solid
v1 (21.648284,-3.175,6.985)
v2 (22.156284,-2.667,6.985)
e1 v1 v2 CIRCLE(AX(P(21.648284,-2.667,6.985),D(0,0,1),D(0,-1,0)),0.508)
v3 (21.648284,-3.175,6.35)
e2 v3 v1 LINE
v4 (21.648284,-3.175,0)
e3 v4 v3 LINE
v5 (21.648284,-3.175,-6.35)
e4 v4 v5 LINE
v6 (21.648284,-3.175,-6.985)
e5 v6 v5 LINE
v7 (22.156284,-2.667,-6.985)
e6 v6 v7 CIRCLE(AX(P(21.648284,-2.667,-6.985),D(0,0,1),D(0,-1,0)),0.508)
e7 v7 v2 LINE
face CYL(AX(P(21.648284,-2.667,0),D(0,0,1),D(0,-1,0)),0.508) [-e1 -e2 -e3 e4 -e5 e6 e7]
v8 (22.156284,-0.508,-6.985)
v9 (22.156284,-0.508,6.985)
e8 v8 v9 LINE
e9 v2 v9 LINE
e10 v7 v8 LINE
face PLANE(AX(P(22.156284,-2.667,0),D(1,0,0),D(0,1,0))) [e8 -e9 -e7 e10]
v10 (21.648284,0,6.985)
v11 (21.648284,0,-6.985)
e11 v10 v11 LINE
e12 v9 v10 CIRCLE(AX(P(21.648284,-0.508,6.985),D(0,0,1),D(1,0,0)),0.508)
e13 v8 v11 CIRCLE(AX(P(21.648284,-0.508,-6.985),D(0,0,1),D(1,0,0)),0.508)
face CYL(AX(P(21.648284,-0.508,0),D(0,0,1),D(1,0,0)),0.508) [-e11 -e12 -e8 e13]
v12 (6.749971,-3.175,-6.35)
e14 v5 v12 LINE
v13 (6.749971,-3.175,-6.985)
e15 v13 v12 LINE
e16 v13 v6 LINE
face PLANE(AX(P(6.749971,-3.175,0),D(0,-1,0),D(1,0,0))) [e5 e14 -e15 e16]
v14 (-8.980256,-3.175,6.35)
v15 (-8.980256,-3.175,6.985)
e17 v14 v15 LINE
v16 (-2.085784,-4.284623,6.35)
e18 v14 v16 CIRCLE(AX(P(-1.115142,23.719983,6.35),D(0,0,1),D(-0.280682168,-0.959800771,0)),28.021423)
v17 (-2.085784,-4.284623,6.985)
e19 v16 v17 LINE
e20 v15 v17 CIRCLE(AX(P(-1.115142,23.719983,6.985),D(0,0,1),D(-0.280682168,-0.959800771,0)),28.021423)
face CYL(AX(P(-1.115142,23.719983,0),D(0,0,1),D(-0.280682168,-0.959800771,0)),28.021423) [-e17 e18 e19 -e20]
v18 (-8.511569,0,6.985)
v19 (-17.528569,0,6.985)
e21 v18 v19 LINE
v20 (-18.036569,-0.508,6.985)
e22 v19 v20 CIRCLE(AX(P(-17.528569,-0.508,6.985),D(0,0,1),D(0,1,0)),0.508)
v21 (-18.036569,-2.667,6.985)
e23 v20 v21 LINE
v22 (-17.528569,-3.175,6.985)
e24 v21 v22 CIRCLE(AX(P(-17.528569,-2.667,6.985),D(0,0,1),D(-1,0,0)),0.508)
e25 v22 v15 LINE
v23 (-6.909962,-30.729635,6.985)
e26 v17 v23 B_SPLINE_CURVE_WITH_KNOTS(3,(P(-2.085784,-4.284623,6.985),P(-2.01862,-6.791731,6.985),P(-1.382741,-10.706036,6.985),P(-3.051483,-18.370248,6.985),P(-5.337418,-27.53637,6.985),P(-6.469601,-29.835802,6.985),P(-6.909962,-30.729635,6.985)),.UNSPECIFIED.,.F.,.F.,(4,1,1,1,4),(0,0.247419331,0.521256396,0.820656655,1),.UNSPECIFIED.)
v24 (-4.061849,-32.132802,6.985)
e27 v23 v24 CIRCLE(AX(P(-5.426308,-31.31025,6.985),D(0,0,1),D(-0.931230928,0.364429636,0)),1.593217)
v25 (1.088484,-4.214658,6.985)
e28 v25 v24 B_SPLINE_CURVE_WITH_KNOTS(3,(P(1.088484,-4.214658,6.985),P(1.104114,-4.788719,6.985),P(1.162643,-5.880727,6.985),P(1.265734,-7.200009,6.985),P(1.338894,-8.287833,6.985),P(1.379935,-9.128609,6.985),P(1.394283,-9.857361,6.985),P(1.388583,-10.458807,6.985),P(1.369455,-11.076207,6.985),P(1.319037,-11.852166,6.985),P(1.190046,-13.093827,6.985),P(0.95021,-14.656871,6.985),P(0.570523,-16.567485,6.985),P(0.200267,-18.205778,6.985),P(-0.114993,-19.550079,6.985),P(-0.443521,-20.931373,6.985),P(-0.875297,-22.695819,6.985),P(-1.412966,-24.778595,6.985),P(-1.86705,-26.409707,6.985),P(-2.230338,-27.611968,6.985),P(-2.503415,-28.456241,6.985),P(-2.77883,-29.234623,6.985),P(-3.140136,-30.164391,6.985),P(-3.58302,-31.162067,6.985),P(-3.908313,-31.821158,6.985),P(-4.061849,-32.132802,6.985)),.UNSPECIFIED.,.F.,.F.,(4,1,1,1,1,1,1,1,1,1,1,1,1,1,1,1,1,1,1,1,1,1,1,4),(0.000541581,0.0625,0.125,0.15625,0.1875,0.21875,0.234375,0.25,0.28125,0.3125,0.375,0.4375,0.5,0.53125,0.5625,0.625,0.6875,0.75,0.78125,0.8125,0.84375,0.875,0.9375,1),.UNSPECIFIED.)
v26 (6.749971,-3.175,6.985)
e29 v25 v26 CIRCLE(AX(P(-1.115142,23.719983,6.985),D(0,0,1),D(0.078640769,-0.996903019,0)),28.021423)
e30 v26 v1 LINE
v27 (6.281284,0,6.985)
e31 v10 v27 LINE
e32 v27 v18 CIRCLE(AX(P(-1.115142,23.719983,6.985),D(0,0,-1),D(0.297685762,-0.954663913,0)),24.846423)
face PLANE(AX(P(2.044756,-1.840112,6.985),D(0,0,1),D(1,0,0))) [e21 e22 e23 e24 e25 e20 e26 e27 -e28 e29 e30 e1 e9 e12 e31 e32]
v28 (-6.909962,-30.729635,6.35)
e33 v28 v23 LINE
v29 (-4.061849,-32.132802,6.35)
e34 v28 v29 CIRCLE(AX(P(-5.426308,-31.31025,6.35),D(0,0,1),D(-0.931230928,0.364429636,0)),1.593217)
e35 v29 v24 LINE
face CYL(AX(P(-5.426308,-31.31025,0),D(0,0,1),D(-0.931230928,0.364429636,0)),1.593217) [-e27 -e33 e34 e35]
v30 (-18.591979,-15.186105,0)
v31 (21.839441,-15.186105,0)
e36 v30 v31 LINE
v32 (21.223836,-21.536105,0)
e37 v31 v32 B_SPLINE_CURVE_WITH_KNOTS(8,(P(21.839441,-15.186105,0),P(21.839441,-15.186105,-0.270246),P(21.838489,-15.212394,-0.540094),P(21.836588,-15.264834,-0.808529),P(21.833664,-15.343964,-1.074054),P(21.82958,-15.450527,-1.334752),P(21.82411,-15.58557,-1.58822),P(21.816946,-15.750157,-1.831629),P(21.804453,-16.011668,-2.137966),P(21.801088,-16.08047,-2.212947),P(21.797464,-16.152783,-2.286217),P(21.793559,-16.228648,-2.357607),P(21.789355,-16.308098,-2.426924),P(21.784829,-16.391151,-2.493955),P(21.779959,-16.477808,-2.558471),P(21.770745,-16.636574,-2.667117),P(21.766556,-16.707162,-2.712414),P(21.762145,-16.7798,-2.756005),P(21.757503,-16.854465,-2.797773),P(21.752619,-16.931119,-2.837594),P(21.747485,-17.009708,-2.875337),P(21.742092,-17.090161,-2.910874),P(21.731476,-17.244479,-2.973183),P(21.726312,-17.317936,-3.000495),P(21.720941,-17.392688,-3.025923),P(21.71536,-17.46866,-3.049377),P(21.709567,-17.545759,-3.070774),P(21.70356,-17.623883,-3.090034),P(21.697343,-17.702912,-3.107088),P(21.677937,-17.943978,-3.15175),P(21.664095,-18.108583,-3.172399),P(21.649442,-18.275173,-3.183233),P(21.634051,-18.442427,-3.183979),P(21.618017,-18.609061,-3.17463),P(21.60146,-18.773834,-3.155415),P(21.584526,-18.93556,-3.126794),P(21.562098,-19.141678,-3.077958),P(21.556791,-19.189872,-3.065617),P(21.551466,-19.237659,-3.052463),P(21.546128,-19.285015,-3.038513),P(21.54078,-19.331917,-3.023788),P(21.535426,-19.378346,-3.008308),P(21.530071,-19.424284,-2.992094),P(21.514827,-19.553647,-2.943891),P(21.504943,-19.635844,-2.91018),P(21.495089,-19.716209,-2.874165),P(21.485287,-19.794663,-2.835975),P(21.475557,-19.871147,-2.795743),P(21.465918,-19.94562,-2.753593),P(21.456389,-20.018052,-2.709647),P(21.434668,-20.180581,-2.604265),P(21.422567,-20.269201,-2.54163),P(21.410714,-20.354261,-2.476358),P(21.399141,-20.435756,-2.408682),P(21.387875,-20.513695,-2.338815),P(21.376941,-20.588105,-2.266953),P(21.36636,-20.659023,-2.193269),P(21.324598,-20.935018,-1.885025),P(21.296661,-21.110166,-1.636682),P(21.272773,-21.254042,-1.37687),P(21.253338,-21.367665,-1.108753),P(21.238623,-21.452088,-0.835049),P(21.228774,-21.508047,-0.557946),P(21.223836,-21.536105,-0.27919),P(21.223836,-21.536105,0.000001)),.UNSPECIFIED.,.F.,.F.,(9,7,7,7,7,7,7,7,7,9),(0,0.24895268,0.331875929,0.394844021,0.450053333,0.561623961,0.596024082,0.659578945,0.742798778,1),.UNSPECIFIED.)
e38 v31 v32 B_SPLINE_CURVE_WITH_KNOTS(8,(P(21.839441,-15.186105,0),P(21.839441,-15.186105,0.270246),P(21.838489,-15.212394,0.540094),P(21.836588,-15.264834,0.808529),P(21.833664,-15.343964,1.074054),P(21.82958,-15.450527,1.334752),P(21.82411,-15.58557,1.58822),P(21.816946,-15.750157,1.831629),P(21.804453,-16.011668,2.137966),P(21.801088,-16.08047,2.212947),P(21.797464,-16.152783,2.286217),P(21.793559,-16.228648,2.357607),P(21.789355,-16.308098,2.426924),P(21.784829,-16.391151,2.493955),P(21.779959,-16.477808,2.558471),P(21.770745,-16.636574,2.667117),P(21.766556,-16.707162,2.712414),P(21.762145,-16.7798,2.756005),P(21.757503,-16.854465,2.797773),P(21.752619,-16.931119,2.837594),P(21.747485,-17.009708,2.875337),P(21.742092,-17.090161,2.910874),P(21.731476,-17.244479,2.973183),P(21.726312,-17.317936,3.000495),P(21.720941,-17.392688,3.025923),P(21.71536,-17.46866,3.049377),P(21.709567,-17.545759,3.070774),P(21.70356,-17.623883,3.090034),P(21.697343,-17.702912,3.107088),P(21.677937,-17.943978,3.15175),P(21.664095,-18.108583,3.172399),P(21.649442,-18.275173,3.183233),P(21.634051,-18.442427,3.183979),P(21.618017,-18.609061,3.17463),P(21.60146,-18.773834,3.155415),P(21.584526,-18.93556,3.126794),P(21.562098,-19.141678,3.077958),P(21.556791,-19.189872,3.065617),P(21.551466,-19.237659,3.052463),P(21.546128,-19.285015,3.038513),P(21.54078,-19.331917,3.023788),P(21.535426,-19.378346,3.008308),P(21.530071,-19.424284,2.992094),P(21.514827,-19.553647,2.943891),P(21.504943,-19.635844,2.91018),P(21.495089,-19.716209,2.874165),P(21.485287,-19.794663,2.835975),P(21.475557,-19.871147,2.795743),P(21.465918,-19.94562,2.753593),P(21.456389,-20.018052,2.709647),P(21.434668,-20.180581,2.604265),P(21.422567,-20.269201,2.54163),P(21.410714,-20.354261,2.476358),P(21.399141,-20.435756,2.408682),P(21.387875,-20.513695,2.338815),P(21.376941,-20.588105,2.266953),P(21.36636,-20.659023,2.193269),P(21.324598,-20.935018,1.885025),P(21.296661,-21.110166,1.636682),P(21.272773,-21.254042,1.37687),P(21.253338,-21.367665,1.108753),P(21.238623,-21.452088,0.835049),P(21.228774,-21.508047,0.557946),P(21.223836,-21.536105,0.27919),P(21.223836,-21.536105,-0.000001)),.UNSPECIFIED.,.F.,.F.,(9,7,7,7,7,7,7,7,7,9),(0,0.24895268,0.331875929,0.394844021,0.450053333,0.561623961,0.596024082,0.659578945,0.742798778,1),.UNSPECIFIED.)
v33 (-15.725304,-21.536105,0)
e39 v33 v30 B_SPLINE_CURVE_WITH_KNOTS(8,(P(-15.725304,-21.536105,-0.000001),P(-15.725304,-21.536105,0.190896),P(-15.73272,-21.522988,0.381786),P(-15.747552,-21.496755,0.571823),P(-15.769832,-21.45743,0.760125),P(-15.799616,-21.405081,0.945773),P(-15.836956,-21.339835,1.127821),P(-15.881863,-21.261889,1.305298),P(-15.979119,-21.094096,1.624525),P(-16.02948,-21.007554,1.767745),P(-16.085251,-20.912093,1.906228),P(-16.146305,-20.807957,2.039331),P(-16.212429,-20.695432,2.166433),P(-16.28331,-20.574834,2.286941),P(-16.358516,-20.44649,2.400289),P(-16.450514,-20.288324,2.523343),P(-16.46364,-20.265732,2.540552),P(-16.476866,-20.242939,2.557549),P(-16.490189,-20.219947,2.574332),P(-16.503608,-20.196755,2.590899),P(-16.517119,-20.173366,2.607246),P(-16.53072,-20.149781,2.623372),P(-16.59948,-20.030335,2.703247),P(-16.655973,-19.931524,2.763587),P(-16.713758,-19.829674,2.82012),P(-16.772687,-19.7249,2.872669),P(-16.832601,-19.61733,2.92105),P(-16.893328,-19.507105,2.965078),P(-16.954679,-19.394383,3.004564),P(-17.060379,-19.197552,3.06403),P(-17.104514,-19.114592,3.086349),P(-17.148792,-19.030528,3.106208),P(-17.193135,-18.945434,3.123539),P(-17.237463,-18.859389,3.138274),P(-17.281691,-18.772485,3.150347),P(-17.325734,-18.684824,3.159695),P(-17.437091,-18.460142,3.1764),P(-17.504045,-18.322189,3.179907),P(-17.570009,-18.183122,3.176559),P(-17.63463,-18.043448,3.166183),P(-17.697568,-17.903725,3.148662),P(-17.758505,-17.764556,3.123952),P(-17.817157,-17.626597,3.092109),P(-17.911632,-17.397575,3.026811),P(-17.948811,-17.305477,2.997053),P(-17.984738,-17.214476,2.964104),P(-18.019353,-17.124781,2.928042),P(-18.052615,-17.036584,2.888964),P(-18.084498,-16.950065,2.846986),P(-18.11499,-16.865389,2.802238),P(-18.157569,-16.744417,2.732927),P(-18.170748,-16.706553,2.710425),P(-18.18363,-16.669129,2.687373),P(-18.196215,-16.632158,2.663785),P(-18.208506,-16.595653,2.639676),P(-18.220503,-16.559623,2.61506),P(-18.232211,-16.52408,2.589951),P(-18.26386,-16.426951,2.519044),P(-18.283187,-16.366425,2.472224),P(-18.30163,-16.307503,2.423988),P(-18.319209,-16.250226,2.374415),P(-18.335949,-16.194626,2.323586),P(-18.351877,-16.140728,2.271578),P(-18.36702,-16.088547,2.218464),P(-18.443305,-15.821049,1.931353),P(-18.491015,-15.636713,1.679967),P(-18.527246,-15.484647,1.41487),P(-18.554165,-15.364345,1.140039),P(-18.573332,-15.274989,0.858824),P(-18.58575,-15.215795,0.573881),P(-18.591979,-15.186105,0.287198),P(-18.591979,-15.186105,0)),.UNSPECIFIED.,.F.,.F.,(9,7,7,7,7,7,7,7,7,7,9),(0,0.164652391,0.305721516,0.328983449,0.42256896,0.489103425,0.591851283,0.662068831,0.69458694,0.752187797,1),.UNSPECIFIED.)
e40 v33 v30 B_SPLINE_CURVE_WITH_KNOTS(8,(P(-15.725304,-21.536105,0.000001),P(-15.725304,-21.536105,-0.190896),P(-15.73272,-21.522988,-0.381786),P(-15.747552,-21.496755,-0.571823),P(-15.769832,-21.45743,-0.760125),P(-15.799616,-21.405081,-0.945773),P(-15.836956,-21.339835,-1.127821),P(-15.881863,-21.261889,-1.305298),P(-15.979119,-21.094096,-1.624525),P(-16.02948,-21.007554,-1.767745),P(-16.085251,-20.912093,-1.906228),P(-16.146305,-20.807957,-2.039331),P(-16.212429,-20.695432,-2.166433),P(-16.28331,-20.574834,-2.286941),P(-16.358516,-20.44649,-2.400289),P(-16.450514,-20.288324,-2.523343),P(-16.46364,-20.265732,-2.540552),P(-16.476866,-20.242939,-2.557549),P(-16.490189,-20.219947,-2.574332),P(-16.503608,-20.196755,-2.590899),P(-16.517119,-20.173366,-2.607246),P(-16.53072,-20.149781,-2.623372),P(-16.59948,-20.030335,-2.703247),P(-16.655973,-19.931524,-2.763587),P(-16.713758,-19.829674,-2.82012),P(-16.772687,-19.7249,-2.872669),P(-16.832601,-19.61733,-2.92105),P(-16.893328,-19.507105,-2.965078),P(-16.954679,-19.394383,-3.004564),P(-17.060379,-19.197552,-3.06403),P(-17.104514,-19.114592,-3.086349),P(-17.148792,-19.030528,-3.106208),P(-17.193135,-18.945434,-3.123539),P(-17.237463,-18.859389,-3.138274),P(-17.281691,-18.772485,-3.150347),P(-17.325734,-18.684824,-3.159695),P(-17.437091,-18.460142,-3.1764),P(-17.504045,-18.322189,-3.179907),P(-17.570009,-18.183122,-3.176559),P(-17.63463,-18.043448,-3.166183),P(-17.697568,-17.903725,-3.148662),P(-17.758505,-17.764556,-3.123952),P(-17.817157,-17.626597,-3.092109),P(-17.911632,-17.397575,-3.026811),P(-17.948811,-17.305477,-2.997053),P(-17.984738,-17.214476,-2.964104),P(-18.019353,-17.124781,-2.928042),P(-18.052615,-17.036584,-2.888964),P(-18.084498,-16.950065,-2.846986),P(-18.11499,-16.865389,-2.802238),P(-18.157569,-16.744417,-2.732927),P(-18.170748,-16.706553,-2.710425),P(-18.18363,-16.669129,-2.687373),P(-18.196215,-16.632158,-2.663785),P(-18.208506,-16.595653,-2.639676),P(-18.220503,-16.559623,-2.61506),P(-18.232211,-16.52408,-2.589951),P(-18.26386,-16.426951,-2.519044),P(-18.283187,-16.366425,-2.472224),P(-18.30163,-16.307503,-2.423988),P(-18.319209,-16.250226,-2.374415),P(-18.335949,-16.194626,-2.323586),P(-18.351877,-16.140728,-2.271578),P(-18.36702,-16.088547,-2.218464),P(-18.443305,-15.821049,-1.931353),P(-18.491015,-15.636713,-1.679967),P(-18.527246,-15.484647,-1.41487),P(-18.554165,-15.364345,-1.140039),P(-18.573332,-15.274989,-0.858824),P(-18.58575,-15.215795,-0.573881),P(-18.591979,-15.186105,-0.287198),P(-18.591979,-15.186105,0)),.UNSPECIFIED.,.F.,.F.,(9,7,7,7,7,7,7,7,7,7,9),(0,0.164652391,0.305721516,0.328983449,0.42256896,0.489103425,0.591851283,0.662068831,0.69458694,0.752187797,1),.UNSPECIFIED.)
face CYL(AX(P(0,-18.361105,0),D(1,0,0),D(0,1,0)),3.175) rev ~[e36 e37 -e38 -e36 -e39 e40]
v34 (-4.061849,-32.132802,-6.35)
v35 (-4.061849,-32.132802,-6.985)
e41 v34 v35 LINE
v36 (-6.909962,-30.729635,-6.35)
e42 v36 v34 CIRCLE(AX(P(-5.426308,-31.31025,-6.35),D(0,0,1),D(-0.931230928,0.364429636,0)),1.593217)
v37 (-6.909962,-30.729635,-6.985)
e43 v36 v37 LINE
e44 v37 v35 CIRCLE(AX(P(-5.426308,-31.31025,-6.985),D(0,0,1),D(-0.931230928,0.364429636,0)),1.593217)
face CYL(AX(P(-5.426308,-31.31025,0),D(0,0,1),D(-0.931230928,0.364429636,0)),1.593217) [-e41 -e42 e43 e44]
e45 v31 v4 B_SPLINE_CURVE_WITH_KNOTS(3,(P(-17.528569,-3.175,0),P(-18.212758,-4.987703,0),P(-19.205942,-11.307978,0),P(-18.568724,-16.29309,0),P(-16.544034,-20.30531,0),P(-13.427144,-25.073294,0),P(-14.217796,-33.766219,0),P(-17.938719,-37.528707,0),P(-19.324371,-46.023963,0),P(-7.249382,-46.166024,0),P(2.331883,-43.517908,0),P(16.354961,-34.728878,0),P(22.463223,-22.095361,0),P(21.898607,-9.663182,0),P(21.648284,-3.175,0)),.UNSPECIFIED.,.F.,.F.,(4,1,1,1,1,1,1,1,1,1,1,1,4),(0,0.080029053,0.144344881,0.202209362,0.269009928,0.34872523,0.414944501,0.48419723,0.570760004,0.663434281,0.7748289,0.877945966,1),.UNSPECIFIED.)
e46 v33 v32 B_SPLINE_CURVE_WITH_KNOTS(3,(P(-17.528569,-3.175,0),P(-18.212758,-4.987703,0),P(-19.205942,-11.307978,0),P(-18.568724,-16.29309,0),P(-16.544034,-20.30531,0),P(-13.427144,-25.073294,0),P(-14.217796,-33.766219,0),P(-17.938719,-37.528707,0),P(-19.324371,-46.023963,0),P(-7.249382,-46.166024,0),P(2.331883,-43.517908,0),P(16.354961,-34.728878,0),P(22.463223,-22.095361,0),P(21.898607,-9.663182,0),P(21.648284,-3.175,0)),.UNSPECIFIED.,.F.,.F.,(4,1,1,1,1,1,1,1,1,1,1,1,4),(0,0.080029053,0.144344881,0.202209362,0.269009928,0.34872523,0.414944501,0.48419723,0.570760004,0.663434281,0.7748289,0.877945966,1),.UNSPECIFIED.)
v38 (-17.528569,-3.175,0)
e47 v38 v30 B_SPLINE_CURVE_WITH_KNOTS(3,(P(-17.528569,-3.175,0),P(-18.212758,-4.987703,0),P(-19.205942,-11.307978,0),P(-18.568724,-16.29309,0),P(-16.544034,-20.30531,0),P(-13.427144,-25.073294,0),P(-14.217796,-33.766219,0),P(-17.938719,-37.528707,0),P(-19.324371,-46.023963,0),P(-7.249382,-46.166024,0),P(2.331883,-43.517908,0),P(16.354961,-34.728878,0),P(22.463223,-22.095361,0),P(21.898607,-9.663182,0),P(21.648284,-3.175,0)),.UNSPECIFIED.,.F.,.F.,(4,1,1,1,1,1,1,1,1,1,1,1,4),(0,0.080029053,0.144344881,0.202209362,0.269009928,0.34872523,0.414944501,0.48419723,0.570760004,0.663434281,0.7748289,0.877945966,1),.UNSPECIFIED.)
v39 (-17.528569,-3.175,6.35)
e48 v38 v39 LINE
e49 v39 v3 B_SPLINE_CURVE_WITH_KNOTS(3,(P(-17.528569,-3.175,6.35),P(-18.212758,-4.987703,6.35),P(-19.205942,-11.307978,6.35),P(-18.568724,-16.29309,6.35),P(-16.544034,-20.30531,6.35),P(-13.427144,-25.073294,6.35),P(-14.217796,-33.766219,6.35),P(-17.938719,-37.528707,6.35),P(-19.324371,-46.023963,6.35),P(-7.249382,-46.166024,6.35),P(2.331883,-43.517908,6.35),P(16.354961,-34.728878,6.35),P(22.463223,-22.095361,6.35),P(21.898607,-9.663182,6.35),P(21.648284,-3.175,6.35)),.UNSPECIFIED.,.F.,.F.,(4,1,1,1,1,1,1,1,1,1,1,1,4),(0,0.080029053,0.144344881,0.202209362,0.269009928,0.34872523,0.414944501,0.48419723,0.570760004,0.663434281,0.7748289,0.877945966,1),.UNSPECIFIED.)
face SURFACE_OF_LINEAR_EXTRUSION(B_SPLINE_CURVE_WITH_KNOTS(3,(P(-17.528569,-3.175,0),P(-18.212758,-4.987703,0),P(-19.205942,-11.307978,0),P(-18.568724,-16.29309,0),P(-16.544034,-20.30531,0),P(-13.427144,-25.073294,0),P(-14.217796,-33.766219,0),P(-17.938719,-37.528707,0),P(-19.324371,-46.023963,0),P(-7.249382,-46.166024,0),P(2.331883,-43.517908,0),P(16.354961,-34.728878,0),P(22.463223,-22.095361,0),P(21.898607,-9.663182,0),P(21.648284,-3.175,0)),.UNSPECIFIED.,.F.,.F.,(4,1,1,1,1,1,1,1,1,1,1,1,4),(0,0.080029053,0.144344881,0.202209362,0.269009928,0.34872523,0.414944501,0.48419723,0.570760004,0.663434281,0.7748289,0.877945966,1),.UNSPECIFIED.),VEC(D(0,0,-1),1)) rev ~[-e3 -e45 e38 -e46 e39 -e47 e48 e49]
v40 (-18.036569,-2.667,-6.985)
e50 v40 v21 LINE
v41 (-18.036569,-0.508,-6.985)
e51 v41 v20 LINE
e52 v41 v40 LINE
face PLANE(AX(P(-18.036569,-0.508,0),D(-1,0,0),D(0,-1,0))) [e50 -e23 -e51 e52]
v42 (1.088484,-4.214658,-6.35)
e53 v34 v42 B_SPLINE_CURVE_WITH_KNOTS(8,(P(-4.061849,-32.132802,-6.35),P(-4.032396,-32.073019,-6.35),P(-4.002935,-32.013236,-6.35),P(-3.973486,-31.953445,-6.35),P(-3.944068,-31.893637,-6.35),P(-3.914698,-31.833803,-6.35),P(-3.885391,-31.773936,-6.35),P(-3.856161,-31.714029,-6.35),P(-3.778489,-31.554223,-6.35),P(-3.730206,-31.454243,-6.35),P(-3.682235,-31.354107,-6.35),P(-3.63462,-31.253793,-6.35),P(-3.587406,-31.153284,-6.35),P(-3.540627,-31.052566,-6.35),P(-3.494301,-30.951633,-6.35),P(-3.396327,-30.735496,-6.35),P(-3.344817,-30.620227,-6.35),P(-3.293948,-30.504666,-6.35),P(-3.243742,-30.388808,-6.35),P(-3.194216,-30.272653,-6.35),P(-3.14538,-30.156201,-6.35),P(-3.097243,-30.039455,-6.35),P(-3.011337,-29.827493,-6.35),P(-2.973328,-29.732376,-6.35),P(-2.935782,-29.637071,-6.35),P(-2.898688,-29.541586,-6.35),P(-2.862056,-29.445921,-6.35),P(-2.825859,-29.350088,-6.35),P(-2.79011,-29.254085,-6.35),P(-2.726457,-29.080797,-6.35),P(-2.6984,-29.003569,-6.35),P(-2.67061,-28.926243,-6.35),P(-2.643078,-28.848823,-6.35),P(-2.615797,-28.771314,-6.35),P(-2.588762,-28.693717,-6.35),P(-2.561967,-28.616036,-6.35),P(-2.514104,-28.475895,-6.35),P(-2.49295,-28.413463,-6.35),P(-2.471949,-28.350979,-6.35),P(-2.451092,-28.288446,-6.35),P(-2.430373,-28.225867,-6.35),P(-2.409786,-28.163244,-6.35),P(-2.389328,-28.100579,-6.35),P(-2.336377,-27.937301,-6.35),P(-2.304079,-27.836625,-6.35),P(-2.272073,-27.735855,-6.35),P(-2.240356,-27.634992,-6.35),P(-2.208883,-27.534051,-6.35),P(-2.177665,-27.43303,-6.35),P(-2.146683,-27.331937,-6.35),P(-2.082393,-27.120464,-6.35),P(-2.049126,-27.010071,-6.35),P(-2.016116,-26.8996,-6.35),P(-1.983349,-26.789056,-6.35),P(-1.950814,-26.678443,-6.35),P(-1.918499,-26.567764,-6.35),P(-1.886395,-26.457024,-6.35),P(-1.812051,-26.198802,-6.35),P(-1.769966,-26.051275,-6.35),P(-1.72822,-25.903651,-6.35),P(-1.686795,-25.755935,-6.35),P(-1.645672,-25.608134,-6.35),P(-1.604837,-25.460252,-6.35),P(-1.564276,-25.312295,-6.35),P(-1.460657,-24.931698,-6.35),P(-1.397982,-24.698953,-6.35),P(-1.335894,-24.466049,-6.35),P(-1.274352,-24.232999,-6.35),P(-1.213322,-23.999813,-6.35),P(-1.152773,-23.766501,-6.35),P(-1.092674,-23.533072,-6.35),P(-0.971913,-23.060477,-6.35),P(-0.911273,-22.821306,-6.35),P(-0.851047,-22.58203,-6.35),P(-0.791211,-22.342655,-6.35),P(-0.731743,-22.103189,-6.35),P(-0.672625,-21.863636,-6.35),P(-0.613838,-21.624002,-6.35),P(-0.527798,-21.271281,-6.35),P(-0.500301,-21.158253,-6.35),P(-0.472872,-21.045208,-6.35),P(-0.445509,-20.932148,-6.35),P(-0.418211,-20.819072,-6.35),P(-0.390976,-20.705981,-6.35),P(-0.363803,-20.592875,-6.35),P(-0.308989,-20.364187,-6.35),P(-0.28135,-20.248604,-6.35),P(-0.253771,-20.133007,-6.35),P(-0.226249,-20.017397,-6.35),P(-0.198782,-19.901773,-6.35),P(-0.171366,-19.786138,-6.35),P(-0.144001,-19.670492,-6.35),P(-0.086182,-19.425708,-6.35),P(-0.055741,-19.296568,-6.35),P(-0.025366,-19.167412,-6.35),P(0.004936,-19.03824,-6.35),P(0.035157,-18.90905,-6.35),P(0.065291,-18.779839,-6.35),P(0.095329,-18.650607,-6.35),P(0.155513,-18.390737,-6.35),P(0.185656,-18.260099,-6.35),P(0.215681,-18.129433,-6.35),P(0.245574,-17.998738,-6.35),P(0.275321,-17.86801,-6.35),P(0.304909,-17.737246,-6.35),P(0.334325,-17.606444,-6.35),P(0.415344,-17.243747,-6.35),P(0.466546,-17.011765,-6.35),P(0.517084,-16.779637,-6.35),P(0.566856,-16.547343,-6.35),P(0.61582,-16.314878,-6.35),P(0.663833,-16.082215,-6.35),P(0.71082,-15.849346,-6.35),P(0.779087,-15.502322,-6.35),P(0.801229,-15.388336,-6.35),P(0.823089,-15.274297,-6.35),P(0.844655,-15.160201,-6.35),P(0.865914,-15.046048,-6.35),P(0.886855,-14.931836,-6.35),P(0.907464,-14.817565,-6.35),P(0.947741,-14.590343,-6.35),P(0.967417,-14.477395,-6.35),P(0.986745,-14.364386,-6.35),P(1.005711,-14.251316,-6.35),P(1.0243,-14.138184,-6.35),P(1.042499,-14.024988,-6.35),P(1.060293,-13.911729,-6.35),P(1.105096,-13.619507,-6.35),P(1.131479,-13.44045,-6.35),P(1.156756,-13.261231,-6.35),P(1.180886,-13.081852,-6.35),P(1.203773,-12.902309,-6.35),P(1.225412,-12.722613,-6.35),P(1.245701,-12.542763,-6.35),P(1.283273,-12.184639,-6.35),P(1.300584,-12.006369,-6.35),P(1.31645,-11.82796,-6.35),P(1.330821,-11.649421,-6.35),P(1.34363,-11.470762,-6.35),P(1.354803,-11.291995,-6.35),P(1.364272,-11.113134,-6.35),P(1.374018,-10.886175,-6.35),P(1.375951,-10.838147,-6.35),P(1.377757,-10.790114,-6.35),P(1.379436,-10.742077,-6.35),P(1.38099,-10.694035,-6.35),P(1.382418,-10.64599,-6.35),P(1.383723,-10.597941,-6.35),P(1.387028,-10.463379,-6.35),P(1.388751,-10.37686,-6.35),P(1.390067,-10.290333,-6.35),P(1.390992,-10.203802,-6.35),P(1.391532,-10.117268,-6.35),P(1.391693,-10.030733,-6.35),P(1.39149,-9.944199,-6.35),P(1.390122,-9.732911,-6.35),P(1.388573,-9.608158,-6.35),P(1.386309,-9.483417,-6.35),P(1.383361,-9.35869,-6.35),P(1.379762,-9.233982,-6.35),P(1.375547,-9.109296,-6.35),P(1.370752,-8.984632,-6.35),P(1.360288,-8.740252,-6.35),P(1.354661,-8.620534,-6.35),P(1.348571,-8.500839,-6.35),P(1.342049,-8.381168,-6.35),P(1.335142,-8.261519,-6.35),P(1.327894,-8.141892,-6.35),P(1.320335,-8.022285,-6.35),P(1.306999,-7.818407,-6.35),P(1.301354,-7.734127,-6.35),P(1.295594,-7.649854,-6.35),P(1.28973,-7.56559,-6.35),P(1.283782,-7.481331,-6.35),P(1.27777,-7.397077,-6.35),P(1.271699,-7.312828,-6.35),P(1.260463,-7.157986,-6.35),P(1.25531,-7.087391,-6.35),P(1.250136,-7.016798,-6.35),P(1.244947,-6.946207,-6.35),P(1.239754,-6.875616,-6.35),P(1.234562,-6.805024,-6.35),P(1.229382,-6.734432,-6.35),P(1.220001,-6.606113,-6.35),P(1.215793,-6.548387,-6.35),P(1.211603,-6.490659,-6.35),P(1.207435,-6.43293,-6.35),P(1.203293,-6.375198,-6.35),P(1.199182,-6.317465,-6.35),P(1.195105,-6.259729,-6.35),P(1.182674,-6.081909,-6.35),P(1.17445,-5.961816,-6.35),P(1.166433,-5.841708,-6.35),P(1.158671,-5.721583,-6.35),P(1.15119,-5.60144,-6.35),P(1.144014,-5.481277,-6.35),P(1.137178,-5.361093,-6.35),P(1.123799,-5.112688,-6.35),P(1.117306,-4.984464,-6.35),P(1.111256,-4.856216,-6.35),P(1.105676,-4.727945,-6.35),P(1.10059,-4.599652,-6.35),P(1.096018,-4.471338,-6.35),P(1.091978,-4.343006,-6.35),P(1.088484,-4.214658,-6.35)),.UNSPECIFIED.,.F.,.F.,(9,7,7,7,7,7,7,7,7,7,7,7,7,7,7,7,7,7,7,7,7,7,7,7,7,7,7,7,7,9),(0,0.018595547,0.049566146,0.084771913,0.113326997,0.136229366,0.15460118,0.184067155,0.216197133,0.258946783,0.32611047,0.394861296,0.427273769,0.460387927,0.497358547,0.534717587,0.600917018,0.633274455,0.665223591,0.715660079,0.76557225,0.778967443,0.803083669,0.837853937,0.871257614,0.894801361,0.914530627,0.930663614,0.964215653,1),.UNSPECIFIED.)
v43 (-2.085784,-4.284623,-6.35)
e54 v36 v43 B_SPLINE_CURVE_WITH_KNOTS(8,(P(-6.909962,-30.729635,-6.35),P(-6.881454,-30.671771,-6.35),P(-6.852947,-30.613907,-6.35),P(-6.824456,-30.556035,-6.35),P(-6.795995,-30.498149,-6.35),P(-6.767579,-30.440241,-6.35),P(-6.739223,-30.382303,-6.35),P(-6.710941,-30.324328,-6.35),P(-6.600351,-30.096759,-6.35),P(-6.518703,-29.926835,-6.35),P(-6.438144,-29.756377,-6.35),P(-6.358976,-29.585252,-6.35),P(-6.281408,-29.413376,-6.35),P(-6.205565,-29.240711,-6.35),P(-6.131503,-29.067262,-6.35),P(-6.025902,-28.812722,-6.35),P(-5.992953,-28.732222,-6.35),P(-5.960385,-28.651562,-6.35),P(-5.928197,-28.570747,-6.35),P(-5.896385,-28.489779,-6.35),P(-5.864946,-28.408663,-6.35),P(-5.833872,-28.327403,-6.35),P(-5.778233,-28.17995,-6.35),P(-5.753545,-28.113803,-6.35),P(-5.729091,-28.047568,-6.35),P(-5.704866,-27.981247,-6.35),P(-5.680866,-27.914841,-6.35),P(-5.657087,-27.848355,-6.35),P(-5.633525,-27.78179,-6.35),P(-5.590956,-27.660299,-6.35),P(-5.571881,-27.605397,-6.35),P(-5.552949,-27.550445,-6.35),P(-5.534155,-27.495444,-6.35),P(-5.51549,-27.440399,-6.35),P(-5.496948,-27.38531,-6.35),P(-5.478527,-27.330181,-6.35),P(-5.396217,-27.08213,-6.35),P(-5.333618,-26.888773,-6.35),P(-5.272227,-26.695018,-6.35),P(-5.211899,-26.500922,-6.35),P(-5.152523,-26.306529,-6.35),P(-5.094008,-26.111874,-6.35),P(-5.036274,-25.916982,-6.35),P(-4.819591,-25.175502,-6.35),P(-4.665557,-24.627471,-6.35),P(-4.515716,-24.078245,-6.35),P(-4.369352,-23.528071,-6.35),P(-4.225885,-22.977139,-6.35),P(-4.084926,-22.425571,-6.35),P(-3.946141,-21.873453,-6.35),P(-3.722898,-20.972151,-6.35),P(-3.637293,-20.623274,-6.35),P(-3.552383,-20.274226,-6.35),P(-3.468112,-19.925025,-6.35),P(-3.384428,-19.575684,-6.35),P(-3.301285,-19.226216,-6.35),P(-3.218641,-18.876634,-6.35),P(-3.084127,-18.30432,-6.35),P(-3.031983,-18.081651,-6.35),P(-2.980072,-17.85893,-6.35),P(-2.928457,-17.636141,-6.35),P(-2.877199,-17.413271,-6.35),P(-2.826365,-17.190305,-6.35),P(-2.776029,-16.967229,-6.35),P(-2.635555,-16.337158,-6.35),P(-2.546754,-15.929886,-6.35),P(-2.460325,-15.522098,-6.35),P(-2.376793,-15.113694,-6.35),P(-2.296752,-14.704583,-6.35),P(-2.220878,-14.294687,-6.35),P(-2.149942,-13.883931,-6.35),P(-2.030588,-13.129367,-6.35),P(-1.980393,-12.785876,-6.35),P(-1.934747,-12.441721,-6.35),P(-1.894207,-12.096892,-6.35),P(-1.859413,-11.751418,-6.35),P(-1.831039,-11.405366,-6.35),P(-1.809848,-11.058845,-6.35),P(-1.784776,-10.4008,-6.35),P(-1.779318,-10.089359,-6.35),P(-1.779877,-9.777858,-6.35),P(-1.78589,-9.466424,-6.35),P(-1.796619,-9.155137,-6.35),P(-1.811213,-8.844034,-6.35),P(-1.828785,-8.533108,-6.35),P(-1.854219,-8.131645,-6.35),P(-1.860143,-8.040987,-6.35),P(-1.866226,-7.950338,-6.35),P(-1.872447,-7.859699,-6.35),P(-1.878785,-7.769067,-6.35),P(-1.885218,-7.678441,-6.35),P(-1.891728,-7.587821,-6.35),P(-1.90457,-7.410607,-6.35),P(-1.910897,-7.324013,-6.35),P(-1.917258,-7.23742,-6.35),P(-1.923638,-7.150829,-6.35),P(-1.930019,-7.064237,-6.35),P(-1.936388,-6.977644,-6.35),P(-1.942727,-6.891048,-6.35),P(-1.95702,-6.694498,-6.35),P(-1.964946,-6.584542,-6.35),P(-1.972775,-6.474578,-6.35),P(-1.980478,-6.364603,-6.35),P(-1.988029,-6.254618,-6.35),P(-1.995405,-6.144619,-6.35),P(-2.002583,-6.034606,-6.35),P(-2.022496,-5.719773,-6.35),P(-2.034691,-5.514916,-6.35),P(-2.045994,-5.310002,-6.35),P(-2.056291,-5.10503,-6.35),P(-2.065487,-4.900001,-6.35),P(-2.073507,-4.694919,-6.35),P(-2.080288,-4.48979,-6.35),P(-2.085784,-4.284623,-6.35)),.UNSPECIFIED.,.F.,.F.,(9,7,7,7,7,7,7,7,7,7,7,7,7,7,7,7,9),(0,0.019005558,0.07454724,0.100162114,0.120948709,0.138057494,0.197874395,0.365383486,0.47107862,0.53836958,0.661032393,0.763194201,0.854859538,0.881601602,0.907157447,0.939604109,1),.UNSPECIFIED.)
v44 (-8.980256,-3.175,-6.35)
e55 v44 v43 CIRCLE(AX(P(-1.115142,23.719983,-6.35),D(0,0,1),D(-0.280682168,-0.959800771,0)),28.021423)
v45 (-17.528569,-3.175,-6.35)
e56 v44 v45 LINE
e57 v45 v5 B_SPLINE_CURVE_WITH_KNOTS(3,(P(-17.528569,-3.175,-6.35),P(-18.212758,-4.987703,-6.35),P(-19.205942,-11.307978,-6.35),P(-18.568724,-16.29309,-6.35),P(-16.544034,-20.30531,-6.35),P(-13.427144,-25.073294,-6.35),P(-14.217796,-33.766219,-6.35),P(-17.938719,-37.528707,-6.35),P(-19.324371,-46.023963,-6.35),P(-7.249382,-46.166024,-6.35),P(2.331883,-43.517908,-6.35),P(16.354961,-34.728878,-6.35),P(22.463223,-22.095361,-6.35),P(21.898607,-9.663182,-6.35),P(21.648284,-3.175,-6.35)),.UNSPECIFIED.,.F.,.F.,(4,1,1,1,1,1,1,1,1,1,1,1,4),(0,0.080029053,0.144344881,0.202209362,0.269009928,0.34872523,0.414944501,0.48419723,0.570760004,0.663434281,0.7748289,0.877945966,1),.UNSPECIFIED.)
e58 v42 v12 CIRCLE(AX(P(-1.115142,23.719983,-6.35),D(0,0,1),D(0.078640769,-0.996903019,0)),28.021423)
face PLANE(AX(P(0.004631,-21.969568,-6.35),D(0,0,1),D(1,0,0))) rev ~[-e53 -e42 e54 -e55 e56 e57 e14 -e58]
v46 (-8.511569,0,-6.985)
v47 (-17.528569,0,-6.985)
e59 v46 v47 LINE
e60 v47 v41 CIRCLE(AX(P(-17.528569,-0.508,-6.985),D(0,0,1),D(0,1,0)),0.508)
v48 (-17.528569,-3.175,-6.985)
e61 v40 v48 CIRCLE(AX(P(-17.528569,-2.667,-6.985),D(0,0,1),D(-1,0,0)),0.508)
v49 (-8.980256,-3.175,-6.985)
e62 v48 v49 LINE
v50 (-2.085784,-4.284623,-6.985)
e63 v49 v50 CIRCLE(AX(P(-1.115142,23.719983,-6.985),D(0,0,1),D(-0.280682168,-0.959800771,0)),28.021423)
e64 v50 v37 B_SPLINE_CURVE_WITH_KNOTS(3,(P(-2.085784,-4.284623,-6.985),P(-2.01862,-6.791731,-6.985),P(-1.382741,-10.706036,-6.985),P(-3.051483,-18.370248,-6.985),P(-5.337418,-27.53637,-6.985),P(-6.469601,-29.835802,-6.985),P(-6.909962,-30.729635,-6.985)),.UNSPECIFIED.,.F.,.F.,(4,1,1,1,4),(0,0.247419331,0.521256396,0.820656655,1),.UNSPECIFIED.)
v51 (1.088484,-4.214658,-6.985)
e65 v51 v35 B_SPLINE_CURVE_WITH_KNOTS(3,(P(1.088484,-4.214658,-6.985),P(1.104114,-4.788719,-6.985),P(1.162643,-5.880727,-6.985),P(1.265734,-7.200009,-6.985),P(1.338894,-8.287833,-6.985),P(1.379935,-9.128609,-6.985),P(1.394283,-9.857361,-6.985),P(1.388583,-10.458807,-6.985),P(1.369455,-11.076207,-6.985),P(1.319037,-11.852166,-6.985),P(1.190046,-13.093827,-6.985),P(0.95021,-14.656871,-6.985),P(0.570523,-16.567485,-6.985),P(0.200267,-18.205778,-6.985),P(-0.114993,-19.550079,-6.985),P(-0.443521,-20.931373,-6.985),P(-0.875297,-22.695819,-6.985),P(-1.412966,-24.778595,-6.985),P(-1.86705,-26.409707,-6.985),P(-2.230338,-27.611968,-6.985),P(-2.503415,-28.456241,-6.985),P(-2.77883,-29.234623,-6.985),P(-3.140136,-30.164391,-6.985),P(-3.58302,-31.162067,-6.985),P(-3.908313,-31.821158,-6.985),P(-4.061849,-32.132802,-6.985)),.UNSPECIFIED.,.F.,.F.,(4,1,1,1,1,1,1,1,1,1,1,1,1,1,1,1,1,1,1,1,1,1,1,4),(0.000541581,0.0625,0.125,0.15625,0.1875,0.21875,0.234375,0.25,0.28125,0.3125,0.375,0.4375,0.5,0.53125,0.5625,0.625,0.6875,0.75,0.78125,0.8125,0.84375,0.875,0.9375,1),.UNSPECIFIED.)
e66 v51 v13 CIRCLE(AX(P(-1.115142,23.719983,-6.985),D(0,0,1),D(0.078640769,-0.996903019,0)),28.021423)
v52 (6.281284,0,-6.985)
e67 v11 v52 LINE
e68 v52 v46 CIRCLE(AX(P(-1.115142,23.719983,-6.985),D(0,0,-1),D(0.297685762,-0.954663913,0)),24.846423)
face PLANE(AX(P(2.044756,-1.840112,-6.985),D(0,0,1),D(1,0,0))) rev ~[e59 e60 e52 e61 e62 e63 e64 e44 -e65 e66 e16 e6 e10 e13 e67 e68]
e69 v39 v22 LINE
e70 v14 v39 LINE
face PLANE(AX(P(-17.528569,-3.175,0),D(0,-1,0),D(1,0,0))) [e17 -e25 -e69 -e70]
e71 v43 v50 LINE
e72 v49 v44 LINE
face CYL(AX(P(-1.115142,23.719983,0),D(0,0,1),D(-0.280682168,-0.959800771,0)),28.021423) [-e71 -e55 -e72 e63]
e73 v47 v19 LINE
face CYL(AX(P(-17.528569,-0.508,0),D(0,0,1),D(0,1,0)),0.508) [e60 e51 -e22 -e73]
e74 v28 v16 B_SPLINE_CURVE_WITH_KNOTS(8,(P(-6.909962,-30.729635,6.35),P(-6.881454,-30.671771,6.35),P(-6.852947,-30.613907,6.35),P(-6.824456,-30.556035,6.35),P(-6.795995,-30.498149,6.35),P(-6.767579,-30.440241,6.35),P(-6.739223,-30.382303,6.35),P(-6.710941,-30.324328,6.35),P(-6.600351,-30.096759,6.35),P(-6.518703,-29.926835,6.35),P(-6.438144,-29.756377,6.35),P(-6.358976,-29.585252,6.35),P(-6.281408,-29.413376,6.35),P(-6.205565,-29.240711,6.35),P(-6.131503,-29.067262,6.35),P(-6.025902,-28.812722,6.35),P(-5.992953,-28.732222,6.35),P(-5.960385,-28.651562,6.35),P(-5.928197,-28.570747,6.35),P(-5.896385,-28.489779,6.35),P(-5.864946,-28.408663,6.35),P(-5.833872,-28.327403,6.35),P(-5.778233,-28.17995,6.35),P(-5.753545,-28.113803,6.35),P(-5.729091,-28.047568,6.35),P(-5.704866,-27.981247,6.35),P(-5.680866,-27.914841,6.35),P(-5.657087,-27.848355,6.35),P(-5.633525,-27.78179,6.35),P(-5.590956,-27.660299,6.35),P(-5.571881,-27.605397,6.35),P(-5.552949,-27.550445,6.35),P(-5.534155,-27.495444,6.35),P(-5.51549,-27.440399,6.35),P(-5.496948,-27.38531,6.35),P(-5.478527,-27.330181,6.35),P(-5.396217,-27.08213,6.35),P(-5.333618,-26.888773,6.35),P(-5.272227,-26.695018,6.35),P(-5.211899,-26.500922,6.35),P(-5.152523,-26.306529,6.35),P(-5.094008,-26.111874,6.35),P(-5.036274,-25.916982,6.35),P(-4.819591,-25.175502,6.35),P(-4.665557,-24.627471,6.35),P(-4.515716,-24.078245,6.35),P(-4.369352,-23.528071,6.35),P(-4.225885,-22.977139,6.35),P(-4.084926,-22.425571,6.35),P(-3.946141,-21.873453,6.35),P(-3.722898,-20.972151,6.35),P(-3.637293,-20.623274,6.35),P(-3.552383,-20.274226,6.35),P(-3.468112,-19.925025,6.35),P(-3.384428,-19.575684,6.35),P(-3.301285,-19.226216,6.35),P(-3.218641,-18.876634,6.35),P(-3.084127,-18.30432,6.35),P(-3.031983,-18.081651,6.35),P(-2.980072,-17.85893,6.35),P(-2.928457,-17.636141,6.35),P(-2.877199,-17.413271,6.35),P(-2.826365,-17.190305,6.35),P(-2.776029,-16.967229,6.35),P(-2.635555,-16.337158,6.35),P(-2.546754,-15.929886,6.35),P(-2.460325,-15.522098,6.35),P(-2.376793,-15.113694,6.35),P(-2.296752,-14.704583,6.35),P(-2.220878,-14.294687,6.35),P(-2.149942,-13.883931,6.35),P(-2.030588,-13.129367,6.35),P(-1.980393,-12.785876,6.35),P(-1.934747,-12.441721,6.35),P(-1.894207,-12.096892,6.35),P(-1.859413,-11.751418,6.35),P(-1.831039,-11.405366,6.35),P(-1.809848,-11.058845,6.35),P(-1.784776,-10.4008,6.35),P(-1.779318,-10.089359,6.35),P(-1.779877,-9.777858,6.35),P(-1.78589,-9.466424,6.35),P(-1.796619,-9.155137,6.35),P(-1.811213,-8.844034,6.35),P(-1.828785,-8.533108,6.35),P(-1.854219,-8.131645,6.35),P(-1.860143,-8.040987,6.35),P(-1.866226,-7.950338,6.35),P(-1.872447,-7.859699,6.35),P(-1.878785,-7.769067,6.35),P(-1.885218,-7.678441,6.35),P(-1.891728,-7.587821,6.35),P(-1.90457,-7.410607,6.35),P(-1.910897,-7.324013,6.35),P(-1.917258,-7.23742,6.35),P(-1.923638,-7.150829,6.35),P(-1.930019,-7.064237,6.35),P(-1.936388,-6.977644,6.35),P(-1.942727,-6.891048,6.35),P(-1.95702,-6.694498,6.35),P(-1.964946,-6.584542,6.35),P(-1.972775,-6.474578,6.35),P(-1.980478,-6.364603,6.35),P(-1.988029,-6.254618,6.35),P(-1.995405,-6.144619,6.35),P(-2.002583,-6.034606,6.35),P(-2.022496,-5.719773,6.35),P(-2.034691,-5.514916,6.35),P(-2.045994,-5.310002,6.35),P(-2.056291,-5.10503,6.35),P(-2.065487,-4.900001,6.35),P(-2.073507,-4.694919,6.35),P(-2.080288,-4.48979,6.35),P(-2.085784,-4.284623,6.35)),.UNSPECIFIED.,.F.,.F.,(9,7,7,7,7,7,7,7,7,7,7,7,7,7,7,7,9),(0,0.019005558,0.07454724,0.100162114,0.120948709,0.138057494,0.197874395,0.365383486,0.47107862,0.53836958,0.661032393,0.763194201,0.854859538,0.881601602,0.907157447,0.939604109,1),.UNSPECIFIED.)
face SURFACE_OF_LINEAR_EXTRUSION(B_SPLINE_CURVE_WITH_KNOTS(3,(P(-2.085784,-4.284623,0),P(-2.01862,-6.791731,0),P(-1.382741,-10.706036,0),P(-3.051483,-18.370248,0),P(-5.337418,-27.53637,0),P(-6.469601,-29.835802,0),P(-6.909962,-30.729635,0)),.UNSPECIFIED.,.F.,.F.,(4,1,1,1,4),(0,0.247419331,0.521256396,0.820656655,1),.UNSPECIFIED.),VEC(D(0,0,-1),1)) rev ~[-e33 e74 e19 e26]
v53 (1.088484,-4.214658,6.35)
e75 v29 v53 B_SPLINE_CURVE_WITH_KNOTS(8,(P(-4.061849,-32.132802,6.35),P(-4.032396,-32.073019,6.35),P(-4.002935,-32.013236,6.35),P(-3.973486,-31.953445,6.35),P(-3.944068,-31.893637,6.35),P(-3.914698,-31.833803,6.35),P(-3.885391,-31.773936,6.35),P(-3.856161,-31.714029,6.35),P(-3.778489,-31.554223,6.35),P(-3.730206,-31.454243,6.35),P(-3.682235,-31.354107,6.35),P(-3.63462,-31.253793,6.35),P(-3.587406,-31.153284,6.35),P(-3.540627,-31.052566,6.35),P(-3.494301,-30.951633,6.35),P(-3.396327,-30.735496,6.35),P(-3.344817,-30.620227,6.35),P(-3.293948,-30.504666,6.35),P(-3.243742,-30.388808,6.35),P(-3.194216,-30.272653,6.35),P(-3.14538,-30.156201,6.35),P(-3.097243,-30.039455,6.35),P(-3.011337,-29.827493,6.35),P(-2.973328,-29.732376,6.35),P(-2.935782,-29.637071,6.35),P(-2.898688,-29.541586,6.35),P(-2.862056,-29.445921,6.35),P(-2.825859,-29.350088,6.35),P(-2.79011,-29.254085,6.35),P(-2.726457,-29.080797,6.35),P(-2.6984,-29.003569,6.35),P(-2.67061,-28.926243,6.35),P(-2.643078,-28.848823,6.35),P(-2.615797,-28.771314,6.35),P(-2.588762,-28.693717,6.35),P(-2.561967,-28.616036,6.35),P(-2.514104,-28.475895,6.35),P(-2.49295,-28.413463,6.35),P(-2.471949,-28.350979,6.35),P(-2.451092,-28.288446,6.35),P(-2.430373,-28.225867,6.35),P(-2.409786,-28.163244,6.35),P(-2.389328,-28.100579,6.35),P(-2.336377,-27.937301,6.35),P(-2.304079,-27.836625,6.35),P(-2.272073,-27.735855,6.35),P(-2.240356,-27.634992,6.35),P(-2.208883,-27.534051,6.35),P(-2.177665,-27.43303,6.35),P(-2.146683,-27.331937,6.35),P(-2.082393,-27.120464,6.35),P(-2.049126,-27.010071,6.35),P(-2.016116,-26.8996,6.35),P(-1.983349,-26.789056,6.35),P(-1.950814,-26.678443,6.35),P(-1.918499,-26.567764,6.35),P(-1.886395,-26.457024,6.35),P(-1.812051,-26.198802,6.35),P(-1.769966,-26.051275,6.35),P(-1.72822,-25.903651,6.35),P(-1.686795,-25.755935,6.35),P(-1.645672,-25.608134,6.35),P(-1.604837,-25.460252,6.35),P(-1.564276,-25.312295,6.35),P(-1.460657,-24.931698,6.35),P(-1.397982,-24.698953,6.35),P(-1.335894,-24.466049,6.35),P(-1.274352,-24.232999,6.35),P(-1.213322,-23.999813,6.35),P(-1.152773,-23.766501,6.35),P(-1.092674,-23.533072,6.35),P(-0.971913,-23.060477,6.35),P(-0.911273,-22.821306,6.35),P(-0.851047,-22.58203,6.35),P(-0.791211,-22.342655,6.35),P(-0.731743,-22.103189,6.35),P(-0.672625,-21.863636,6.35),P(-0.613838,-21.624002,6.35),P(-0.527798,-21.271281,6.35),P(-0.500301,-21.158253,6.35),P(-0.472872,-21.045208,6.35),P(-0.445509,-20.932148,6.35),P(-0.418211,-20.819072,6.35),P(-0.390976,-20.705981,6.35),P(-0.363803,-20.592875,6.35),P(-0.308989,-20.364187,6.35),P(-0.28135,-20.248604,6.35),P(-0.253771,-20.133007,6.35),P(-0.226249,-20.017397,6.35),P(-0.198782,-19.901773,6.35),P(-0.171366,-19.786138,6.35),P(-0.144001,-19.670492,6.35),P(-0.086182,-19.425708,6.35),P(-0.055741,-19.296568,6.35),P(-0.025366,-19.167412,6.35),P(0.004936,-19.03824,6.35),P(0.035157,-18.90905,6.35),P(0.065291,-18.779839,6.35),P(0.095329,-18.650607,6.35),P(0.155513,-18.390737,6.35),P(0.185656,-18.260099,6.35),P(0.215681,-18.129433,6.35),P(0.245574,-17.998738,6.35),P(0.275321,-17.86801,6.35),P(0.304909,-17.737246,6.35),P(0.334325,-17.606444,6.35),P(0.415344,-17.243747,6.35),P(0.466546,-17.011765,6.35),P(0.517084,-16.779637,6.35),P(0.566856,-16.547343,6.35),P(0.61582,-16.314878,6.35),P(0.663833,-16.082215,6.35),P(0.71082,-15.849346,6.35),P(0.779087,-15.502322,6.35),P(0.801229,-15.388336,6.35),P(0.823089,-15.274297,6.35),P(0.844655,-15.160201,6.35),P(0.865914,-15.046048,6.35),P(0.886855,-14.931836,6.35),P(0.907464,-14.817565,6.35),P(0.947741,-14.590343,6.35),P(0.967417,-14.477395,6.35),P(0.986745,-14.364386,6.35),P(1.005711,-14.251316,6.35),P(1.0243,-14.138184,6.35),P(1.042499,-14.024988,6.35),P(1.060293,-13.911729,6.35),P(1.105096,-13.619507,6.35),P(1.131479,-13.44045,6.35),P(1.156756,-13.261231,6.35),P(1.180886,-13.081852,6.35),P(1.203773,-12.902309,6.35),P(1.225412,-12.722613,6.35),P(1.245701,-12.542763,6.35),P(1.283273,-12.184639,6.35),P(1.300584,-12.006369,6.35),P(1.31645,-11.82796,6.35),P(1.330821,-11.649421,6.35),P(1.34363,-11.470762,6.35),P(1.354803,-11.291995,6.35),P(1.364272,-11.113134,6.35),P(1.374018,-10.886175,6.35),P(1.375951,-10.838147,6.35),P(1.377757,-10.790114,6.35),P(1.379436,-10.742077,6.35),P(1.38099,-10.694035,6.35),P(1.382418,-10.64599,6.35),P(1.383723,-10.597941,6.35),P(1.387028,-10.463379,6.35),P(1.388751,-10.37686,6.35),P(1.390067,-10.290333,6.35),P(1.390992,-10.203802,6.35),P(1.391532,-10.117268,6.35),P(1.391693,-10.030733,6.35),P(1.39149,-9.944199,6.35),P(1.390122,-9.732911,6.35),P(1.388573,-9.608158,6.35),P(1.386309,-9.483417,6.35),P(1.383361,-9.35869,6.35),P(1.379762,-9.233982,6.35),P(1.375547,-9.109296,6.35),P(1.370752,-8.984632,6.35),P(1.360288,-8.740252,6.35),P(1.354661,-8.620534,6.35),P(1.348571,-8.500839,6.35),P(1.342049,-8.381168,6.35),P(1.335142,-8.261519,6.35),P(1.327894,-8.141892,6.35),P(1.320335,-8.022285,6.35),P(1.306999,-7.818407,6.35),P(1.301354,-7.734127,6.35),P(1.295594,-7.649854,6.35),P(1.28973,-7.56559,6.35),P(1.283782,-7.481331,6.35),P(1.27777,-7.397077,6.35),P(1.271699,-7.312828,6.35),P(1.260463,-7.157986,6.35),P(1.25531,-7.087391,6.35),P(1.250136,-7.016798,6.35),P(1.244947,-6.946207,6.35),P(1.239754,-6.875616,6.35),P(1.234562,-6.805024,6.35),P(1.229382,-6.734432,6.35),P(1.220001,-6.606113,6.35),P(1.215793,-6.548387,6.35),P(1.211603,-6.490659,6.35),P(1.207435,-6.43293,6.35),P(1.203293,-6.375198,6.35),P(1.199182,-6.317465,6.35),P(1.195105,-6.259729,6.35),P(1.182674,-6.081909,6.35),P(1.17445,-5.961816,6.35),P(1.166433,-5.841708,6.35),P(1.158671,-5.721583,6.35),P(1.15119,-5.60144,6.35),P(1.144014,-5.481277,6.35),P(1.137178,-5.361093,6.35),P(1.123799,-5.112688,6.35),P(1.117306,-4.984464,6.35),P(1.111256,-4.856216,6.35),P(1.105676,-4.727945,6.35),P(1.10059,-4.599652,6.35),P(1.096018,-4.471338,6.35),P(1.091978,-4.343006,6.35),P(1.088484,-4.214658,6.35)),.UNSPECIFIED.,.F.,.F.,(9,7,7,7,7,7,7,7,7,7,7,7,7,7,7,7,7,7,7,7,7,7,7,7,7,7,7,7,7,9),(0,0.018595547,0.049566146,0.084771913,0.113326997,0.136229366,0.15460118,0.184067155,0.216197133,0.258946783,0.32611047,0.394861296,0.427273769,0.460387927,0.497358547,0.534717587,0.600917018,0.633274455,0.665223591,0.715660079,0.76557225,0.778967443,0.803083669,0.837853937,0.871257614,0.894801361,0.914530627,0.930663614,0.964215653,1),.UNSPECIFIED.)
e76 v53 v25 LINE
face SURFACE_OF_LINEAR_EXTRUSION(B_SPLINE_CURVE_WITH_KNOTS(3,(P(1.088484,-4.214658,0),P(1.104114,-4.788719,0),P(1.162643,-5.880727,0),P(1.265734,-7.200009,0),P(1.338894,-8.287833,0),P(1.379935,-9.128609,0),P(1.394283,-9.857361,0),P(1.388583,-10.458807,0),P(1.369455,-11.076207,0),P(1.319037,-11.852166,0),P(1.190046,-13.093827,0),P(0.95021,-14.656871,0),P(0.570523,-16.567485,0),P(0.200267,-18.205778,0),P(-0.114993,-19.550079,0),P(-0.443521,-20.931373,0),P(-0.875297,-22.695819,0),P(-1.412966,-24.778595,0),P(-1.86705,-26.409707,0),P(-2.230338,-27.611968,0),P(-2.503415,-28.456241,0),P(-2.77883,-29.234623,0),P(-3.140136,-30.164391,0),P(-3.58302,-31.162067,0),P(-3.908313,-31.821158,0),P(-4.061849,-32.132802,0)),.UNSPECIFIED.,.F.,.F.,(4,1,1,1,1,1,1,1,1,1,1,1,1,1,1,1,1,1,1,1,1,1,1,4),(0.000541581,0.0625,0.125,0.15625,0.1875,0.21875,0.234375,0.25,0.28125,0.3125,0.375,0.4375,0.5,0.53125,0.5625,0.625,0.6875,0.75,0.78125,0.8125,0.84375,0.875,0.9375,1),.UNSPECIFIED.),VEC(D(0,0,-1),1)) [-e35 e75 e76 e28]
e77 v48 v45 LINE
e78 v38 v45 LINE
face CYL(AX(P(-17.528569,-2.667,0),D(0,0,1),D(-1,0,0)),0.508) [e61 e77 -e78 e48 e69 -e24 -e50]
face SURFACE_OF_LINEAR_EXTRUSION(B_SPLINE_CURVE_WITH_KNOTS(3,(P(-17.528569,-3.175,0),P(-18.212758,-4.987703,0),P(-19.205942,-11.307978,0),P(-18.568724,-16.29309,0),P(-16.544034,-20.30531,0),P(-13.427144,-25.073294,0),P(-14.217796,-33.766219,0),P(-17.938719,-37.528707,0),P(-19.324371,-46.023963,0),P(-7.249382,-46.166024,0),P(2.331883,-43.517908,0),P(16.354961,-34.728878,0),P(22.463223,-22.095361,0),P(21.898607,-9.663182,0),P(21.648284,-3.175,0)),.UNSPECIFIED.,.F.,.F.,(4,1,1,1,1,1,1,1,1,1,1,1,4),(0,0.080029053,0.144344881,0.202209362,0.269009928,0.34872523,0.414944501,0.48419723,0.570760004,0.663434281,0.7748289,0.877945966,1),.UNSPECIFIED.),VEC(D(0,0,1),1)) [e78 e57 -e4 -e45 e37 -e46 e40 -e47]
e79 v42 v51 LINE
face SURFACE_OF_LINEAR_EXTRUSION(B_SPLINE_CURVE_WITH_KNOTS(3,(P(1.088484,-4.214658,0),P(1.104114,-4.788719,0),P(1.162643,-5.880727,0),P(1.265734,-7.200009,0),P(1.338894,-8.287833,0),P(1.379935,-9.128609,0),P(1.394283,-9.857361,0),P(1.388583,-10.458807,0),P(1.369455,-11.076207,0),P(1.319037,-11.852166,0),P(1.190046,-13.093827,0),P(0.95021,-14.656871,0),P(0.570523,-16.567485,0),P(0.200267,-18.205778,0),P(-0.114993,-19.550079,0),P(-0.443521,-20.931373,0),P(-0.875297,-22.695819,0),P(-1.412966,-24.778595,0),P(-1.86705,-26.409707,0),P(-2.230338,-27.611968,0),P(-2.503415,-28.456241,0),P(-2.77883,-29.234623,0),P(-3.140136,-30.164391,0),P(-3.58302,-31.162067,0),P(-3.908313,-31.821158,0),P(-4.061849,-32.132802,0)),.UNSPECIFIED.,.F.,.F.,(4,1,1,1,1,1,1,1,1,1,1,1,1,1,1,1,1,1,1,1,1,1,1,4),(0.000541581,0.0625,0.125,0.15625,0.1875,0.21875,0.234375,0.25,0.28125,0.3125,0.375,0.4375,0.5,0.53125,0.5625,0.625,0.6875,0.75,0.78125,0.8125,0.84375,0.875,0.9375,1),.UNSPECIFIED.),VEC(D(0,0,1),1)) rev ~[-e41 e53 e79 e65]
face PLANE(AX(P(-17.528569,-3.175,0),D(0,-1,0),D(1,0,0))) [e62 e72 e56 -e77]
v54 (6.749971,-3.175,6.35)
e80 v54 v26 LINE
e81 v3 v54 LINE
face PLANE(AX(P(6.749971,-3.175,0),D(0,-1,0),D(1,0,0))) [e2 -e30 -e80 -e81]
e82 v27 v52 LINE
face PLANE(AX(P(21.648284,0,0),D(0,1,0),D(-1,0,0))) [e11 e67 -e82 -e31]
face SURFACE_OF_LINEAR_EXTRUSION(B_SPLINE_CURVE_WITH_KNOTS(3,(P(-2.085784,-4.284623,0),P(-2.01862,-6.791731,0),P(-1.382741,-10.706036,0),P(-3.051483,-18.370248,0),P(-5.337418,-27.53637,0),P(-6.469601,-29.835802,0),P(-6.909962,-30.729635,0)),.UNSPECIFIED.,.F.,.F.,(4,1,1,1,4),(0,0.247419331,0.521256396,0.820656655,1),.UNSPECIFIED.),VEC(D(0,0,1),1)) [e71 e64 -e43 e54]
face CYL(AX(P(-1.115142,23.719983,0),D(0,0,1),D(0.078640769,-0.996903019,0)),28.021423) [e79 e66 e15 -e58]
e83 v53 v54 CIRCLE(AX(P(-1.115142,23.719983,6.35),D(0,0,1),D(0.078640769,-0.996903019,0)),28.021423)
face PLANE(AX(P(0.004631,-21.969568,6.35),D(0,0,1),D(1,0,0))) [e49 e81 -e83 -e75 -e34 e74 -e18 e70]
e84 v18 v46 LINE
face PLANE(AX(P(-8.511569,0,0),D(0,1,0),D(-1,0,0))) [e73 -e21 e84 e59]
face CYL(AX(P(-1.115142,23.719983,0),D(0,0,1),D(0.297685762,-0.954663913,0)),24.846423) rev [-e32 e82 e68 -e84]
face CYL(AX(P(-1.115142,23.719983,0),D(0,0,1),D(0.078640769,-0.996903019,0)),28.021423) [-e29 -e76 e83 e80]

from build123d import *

# Parameters (mm, degrees)
F1_DEPTH = 6.985
F3_DEPTH = 6.35
F4_R     = 3.175
F5_DEPTH = 25.4


# Not quite as in the source:
# - the dataset's text gives a spline's control points without its knots; the knots are read off the source's solid


with BuildPart() as f1:
    # F0 (on Top) → F1 (new body, symmetric)
    with BuildSketch(Plane.XY):
        with BuildLine():
            Line((-8.5115687318, 0), (-17.5285687318, 0))
            ThreePointArc((-17.5285687318, 0), (-17.8877789767, -0.1487897552), (-18.0365687318, -0.508))
            Line((-18.0365687318, -0.508), (-18.0365687318, -2.667))
            ThreePointArc((-18.0365687318, -2.667), (-17.8877789767, -3.0262102448), (-17.5285687318, -3.175))
            Line((-17.5285687318, -3.175), (-8.9802561211, -3.175))
            ThreePointArc((-8.9802561211, -3.175), (-5.567721427, -3.9454225439), (-2.0857842173, -4.2846233733))
            ThreePointArc((-2.0857842173, -4.2846233733), (-0.4976584373, -4.2946352768), (1.0884838419, -4.2146577721))
            ThreePointArc((1.0884838419, -4.2146577721), (3.9459941464, -3.8405870368), (6.7499713132, -3.175))
            Line((6.7499713132, -3.175), (21.6482839239, -3.175))
            ThreePointArc((21.6482839239, -3.175), (22.0074941688, -3.0262102448), (22.1562839239, -2.667))
            Line((22.1562839239, -2.667), (22.1562839239, -0.508))
            ThreePointArc((22.1562839239, -0.508), (22.0074941688, -0.1487897552), (21.6482839239, 0))
            Line((21.6482839239, 0), (6.2812839239, 0))
            ThreePointArc((6.2812839239, 0), (-1.115142404, -1.1264395842), (-8.5115687318, 0))
        make_face()
        with BuildLine():
            ThreePointArc((1.0884838419, -4.2146577721), (-0.4976584373, -4.2946352768), (-2.0857842173, -4.2846233733))
            add(Edge.make_bspline(
                [(-2.0857842173, -4.2846233733), (-2.0186199799, -6.7917309713), (-1.3827408713, -10.7060362833), (-3.0514833549, -18.3702475343), (-5.3374183121, -27.5363695718), (-6.4696007178, -29.8358016288), (-6.9099617242, -30.7296345431)],
                knots=[0, 0, 0, 0, 0.2474193311, 0.5212563963, 0.8206566545, 1, 1, 1, 1], degree=3))
            ThreePointArc((-6.9099617242, -30.7296345431), (-6.1304191803, -32.7394350662), (-4.0618492346, -32.1328024756))
            add(Edge.make_bspline(
                [(1.0884838419, -4.2146577721), (1.1041136891, -4.7887191014), (1.1626428475, -5.8807272883), (1.2657335763, -7.2000093187), (1.3388942315, -8.2878331518), (1.379934699, -9.1286093049), (1.3942832103, -9.8573605503), (1.3885828158, -10.4588066051), (1.3694554964, -11.0762065107), (1.319036928, -11.8521658025), (1.1900459057, -13.0938268387), (0.9502096314, -14.6568714282), (0.5705234126, -16.567484773), (0.2002671656, -18.2057784722), (-0.1149929826, -19.5500794084), (-0.4435211016, -20.9313730655), (-0.8752970723, -22.6958190135), (-1.4129660983, -24.7785954156), (-1.867050274, -26.4097068901), (-2.230338473, -27.6119678291), (-2.5034145996, -28.4562408889), (-2.7788303173, -29.2346230816), (-3.1401362262, -30.1643913253), (-3.5830203882, -31.1620666475), (-3.9083126686, -31.8211580877), (-4.0618492346, -32.1328024756)],
                knots=[0.0005415805, 0.0005415805, 0.0005415805, 0.0005415805, 0.0625, 0.125, 0.15625, 0.1875, 0.21875, 0.234375, 0.25, 0.28125, 0.3125, 0.375, 0.4375, 0.5, 0.53125, 0.5625, 0.625, 0.6875, 0.75, 0.78125, 0.8125, 0.84375, 0.875, 0.9375, 1, 1, 1, 1], degree=3))
        make_face()
    extrude(amount=F1_DEPTH, both=True)

    # F2 (on Top) → F3 (join, symmetric)
    with BuildSketch(Plane.XY):
        with BuildLine():
            Line((-8.9802561211, -3.175), (-17.5285687318, -3.175))
            add(Edge.make_bspline(
                [(-17.5285687318, -3.175), (-18.2127580333, -4.9877029103), (-19.205941601, -11.3079780332), (-18.5687236072, -16.2930895041), (-16.5440340125, -20.3053098017), (-13.427143659, -25.0732944009), (-14.2177962554, -33.7662189884), (-17.9387187249, -37.5287065133), (-19.32437096, -46.023963295), (-7.2493815767, -46.1660242972), (2.3318830255, -43.5179077905), (16.3549608676, -34.7288777698), (22.463223389, -22.0953612128), (21.8986071096, -9.6631822871), (21.6482839239, -3.175)],
                knots=[0, 0, 0, 0, 0.0800290525, 0.1443448809, 0.2022093619, 0.2690099284, 0.3487252296, 0.4149445011, 0.4841972302, 0.5707600044, 0.663434281, 0.7748289004, 0.877945966, 1, 1, 1, 1], degree=3))
            Line((21.6482839239, -3.175), (6.7499713132, -3.175))
            ThreePointArc((6.7499713132, -3.175), (-1.115142404, -4.1752304513), (-8.9802561211, -3.175))
        make_face()
    extrude(amount=F3_DEPTH, both=True)

    # F4 (on Right) → F5 (cut, symmetric)
    with BuildSketch(Plane.YZ):
        with Locations((-18.3611052553, 0)):
            Circle(F4_R)
    extrude(amount=F5_DEPTH, both=True, mode=Mode.SUBTRACT)


solid = f1.part
